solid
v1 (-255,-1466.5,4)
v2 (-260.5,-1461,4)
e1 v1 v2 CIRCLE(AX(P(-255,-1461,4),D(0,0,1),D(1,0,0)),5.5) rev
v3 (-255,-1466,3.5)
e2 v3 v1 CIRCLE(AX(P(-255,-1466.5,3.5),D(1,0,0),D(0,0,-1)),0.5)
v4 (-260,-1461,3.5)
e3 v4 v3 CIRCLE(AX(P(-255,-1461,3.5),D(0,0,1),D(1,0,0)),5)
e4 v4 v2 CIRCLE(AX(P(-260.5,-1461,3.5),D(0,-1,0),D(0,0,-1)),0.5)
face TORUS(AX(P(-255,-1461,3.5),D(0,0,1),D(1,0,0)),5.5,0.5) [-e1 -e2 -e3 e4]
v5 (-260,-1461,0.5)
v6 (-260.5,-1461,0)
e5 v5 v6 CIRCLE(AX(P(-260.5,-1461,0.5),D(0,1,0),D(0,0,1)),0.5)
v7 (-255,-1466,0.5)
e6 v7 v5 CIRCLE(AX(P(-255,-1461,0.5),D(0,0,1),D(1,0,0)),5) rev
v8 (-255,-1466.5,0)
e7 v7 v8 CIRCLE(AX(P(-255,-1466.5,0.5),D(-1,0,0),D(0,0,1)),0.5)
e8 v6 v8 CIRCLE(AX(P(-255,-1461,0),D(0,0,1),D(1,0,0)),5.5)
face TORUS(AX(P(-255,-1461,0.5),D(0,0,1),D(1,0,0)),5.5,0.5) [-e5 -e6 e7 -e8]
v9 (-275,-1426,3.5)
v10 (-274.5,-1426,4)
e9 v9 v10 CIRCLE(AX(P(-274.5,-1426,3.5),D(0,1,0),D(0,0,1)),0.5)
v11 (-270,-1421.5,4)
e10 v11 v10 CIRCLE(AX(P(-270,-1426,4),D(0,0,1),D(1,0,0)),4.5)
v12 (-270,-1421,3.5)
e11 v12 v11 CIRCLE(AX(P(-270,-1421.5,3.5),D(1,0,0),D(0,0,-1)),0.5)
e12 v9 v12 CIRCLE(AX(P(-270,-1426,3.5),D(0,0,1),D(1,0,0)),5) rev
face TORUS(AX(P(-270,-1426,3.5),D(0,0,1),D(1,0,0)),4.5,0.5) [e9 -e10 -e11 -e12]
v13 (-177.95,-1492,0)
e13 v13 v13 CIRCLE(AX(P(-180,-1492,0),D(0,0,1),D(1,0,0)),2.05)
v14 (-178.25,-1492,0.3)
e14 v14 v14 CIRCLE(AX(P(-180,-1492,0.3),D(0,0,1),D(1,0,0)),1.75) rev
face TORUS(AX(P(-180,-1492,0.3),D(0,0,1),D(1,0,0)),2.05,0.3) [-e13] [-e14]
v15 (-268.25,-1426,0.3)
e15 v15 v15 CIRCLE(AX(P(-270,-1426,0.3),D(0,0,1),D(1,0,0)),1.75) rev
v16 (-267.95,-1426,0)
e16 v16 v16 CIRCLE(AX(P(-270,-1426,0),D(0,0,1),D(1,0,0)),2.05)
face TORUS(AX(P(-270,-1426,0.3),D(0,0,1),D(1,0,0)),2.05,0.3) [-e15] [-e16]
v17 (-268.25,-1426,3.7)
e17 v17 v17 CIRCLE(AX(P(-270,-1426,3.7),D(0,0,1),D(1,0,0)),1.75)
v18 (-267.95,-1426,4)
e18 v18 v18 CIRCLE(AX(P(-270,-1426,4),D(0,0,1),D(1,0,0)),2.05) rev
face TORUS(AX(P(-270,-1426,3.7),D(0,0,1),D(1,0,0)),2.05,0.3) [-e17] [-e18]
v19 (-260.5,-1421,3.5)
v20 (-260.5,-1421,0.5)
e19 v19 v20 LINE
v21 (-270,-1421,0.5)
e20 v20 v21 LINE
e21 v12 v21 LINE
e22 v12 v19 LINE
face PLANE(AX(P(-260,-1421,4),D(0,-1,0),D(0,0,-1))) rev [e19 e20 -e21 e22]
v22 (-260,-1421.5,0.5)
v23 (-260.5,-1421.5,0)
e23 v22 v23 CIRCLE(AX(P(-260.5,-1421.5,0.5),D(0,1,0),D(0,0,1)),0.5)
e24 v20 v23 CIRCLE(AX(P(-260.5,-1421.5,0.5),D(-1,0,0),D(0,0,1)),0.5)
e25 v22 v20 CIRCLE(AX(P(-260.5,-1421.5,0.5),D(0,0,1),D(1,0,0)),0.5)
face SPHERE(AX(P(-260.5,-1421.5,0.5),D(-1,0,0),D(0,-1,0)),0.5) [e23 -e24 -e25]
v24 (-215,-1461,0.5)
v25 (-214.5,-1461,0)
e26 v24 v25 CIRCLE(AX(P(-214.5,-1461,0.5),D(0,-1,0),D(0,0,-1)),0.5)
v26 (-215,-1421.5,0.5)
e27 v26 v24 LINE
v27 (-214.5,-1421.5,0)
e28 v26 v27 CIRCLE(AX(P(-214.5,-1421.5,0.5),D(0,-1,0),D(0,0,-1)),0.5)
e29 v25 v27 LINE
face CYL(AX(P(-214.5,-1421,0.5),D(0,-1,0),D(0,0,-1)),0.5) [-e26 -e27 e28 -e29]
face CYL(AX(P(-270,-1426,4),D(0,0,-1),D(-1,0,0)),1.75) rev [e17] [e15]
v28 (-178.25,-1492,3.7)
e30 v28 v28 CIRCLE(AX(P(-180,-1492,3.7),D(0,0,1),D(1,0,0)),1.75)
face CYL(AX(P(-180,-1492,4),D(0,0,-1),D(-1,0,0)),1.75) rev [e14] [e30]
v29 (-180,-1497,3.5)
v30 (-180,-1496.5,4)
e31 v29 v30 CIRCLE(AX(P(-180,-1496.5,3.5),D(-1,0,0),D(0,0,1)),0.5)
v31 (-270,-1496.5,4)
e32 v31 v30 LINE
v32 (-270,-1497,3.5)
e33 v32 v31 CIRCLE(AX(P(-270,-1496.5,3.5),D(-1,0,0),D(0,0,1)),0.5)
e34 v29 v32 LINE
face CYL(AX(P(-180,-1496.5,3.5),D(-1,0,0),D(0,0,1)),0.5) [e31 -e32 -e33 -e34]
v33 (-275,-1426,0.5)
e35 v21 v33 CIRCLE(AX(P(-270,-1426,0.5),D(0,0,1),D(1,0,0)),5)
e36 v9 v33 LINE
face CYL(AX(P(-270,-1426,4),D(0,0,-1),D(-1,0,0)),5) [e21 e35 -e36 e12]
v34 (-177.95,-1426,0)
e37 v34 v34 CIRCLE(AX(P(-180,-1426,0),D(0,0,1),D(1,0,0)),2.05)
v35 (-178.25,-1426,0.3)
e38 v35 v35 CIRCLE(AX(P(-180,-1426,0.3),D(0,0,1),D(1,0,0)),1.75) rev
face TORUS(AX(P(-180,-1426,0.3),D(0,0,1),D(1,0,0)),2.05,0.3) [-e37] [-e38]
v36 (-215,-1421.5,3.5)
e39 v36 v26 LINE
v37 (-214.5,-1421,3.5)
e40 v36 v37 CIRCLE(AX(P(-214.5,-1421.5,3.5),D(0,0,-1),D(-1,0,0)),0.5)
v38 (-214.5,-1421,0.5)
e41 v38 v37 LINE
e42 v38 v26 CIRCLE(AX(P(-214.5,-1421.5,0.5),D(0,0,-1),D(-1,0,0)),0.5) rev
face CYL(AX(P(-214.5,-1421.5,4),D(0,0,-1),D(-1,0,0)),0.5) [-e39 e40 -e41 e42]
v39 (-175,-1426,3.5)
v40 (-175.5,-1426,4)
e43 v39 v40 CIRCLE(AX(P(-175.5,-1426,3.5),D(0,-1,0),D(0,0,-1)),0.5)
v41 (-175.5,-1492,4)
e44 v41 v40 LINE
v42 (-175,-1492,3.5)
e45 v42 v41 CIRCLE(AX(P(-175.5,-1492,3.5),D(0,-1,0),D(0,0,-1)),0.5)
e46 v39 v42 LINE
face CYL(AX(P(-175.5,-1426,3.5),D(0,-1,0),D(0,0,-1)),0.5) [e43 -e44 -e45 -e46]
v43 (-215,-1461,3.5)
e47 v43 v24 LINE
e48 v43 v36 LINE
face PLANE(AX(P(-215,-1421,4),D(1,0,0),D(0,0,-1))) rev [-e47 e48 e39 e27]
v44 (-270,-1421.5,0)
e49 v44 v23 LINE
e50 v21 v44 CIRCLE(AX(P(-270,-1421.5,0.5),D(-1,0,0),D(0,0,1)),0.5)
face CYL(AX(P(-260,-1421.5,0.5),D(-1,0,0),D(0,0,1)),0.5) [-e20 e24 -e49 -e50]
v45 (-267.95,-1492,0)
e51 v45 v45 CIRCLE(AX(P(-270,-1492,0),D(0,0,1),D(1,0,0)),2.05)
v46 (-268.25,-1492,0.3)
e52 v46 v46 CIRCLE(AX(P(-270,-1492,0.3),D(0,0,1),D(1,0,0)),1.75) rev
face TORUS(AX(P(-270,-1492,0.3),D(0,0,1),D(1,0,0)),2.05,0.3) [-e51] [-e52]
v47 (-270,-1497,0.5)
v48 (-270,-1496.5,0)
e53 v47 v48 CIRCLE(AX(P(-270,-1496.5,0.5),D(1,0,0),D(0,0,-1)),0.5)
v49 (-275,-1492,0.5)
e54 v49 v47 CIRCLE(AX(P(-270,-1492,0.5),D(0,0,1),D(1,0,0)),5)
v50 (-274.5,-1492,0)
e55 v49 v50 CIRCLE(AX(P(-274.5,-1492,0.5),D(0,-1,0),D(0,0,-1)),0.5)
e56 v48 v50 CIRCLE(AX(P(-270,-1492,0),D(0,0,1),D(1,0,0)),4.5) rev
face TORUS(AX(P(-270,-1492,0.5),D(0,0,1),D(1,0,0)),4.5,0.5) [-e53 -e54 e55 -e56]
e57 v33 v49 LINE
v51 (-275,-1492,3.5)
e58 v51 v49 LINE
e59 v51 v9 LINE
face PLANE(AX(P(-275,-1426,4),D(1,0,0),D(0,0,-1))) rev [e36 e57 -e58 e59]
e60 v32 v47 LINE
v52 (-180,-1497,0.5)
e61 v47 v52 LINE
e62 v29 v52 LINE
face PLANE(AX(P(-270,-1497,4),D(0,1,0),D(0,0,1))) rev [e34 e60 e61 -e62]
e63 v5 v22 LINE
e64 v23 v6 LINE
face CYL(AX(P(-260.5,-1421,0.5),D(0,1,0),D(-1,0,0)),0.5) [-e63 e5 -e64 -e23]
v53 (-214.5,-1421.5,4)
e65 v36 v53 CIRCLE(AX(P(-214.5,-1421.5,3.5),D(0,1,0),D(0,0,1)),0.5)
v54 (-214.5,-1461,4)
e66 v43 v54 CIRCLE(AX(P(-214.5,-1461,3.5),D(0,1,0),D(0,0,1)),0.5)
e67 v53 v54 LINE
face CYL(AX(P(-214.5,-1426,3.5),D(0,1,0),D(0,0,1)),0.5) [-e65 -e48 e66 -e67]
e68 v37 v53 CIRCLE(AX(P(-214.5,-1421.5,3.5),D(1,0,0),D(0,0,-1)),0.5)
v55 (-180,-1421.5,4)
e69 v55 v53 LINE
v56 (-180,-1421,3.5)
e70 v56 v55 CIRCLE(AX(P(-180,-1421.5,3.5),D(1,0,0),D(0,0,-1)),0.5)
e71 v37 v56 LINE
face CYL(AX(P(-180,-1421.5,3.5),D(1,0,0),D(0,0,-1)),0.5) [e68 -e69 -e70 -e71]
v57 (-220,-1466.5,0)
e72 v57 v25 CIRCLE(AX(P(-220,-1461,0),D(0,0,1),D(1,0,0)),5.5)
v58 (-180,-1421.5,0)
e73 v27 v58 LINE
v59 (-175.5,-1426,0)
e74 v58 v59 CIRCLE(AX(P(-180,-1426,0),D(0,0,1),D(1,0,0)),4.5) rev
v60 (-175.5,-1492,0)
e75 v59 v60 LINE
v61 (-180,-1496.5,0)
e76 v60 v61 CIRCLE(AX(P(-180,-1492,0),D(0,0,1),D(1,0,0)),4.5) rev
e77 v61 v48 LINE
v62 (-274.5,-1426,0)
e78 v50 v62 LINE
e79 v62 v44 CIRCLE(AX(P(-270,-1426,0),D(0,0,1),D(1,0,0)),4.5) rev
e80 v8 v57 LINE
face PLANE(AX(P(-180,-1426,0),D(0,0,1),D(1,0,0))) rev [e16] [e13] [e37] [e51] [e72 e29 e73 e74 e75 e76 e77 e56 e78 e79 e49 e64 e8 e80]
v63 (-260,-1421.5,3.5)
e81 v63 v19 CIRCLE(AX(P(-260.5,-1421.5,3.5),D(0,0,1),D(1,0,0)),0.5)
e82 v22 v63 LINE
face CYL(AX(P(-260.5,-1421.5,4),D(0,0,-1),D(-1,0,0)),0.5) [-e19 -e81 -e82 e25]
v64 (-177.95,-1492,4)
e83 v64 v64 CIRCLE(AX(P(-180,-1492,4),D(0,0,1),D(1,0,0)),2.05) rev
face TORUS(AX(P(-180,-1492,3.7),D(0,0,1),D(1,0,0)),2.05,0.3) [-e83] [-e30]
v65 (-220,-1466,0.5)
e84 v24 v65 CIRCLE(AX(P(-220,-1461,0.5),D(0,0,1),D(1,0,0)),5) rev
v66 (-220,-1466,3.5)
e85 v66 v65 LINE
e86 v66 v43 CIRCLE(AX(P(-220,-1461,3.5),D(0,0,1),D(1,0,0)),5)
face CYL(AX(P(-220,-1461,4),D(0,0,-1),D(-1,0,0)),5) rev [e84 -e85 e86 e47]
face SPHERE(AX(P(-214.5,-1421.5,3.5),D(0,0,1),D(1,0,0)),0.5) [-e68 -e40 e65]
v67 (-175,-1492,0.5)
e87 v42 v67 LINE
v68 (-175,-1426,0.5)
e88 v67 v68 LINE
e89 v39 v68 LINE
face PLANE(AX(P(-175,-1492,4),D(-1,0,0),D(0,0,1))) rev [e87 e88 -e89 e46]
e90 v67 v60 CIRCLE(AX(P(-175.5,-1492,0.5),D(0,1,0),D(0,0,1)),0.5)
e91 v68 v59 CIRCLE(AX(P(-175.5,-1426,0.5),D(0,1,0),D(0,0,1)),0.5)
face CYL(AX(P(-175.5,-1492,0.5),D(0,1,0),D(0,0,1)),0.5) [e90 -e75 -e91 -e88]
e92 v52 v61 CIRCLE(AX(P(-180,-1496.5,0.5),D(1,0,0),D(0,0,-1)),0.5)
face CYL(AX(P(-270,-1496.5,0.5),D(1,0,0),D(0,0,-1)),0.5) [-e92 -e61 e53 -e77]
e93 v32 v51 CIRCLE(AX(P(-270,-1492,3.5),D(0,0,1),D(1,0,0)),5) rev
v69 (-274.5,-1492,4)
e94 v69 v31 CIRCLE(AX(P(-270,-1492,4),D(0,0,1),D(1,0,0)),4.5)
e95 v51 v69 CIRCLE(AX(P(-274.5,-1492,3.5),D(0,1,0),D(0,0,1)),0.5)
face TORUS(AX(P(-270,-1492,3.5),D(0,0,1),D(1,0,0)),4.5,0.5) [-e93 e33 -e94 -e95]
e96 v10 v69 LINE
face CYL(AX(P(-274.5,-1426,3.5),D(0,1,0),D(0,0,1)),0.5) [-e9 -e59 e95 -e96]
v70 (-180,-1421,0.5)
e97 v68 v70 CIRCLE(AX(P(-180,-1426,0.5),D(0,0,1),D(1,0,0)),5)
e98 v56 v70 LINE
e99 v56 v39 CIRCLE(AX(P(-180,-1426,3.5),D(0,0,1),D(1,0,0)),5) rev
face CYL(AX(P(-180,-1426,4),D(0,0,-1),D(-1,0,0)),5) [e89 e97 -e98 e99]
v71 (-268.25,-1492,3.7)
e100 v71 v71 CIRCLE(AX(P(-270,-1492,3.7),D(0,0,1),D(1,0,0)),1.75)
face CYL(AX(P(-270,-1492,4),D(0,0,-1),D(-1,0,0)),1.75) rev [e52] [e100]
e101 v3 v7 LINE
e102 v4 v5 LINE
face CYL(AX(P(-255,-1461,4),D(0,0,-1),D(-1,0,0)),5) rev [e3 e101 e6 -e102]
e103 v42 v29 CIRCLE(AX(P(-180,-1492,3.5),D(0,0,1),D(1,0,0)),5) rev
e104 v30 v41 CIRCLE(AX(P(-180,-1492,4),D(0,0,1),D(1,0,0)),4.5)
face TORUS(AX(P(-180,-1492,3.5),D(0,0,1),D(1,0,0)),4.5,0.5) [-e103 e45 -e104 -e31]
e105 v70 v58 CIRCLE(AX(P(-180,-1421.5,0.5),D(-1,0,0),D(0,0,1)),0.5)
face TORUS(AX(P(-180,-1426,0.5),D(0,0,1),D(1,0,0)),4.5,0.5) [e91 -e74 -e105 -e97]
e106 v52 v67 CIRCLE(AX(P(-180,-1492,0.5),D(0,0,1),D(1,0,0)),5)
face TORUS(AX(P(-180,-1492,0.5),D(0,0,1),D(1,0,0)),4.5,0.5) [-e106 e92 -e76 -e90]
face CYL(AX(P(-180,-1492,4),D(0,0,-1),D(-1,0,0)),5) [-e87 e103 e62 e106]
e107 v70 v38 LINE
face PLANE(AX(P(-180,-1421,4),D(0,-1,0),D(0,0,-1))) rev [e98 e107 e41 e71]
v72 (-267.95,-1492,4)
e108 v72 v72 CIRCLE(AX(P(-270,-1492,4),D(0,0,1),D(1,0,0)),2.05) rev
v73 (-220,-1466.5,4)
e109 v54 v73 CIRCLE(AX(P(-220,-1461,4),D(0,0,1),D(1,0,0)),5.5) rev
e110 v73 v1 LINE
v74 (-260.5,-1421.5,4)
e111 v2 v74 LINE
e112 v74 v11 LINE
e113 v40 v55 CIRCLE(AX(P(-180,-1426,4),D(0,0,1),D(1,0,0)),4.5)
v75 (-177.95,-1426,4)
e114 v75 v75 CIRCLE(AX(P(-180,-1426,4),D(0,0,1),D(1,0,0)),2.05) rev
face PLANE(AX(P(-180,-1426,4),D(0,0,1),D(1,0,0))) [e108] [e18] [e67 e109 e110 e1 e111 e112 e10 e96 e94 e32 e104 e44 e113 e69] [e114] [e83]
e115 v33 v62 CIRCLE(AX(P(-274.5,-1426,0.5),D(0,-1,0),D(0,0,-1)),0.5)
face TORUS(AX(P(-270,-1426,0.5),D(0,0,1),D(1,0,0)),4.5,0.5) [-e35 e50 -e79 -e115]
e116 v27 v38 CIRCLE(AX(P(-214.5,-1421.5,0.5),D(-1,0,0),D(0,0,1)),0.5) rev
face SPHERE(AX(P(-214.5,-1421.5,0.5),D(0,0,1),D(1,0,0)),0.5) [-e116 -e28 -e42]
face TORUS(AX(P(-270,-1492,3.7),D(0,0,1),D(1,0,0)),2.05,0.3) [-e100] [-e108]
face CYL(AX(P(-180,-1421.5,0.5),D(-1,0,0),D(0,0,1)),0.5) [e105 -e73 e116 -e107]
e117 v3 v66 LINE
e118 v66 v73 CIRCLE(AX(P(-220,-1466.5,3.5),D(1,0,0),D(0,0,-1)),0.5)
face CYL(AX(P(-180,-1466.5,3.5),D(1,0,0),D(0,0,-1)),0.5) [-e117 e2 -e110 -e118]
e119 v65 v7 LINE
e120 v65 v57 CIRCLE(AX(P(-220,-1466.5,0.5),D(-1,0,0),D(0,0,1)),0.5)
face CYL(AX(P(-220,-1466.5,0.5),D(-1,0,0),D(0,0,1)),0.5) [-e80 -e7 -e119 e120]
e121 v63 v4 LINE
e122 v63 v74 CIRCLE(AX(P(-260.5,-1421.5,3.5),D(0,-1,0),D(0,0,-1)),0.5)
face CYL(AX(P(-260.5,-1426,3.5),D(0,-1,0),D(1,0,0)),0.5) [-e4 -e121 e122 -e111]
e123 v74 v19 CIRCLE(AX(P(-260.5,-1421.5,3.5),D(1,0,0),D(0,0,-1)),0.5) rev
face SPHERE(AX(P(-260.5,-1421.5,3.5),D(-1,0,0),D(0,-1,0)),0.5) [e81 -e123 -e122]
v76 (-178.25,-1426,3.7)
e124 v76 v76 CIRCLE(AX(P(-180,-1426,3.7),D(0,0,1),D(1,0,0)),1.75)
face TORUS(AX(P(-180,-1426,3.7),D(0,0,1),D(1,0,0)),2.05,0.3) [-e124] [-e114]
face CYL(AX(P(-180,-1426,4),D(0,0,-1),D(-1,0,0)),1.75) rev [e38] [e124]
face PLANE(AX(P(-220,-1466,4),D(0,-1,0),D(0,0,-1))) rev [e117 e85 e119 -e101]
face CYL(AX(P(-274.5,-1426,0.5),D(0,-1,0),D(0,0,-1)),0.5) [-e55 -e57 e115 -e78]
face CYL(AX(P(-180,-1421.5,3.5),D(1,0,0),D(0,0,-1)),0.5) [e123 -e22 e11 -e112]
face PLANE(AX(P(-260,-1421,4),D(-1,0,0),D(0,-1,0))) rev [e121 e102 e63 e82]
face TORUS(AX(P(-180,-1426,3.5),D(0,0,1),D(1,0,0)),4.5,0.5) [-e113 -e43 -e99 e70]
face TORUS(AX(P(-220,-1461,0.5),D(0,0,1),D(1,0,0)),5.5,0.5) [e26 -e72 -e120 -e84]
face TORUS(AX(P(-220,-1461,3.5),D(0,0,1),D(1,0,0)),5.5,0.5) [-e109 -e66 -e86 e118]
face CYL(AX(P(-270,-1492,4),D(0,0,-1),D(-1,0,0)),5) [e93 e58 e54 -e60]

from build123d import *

# Parameters (mm, degrees)
SKETCH2_R           = 1.75
BOSS_EXTRUDE1_DEPTH = 4
FILLET1_R           = 0.5
FILLET2_R           = 0.5
FILLET3_R           = 0.3


with BuildPart() as part:
    # Sketch2 → Boss-Extrude1 (new body)
    with BuildSketch(Plane.XY):
        with BuildLine():
            Line((-260, -1421), (-270, -1421))
            ThreePointArc((-270, -1421), (-273.535533906, -1422.464466094), (-275, -1426))
            Line((-275, -1426), (-275, -1492))
            ThreePointArc((-275, -1492), (-273.535533906, -1495.535533906), (-270, -1497))
            Line((-270, -1497), (-180, -1497))
            ThreePointArc((-180, -1497), (-176.464466094, -1495.535533906), (-175, -1492))
            Line((-175, -1492), (-175, -1426))
            ThreePointArc((-175, -1426), (-176.464466094, -1422.464466094), (-180, -1421))
            Line((-180, -1421), (-215, -1421))
            Line((-215, -1421), (-215, -1461))
            ThreePointArc((-215, -1461), (-216.464466094, -1464.535533906), (-220, -1466))
            Line((-220, -1466), (-255, -1466))
            ThreePointArc((-255, -1466), (-258.535533906, -1464.535533906), (-260, -1461))
            Line((-260, -1461), (-260, -1421))
        make_face()
        with Locations((-180, -1492)):
            Circle(SKETCH2_R, mode=Mode.SUBTRACT)
        with Locations((-270, -1492)):
            Circle(SKETCH2_R, mode=Mode.SUBTRACT)
        with Locations((-270, -1426)):
            Circle(SKETCH2_R, mode=Mode.SUBTRACT)
        with Locations((-180, -1426)):
            Circle(SKETCH2_R, mode=Mode.SUBTRACT)
    extrude(amount=BOSS_EXTRUDE1_DEPTH)

    # Fillet1
    fillet1_edges = [part.edges().sort_by_distance(p)[0] for p in [
        (-175, -1459, 0),
        (-176.464466094, -1495.535533906, 0),
        (-225, -1497, 0),
        (-273.535533906, -1495.535533906, 0),
        (-275, -1459, 0),
        (-273.535533906, -1422.464466094, 0),
        (-265, -1421, 0),
        (-197.5, -1421, 0),
        (-176.464466094, -1422.464466094, 0),
        (-215, -1421, 2),
        (-265, -1421, 4),
        (-273.535533906, -1422.464466094, 4),
        (-275, -1459, 4),
        (-273.535533906, -1495.535533906, 4),
        (-225, -1497, 4),
        (-176.464466094, -1422.464466094, 4),
        (-176.464466094, -1495.535533906, 4),
        (-175, -1459, 4),
        (-197.5, -1421, 4),
    ]]
    fillet(fillet1_edges, radius=FILLET1_R)

    # Fillet2
    # the kernel refuses this fillet: 0.5 mm, written as the material it takes off along each edge
    with BuildSketch(Plane(origin=(-214.5, -1421.5, 0.5), x_dir=(-1, 0, 0), z_dir=(0, 0, -1))) as fillet2_piece_1_section:
        Polygon((0, 0), (FILLET2_R, 0), (FILLET2_R, FILLET2_R), (0, FILLET2_R), align=None)
    fillet2_piece_1 = extrude(amount=FILLET2_R, mode=Mode.PRIVATE)
    fillet2_piece_1 = fillet2_piece_1 - Plane(origin=(-214.5, -1421.5, 0.5), x_dir=(0.7071067811865475, -0.7071067811865475, 0), z_dir=(0, 0, -1)) * Sphere(FILLET2_R, mode=Mode.PRIVATE)
    add(fillet2_piece_1, mode=Mode.SUBTRACT)
    with BuildSketch(Plane(origin=(-214.5, -1421.5, 3.5), x_dir=(-1, 0, 0), z_dir=(0, 0, 1))) as fillet2_piece_2_section:
        Polygon((0, 0), (FILLET2_R, 0), (FILLET2_R, -FILLET2_R), (0, -FILLET2_R), align=None)
    fillet2_piece_2 = extrude(amount=FILLET2_R, mode=Mode.PRIVATE)
    fillet2_piece_2 = fillet2_piece_2 - Plane(origin=(-214.5, -1421.5, 3.5), x_dir=(0.7071067811865475, -0.7071067811865475, 0), z_dir=(0, 0, 1)) * Sphere(FILLET2_R, mode=Mode.PRIVATE)
    add(fillet2_piece_2, mode=Mode.SUBTRACT)
    with BuildSketch(Plane(origin=(-260, -1461, 0), x_dir=(0, 0, 1), z_dir=(0, 1, 0)), Plane(origin=(-215, -1421.5, 4), x_dir=(1, 0, 0), z_dir=(0, -1, 0))) as fillet2_piece_3:
        with BuildLine():
            CenterArc((FILLET2_R, -FILLET2_R), FILLET2_R, 90, 90)
            Line((0, -FILLET2_R), (0, 0))
            Line((0, 0), (FILLET2_R, 0))
        make_face()
    extrude(amount=39.5, mode=Mode.SUBTRACT)
    with BuildSketch(Plane(origin=(-220, -1461, 4), x_dir=(1, 0, 0), z_dir=(0, 1, 0))) as fillet2_piece_4:
        with BuildLine():
            CenterArc((5 + FILLET2_R, FILLET2_R), FILLET2_R, 180, 90)
            Line((5, FILLET2_R), (5, 0))
            Line((5, 0), (5 + FILLET2_R, 0))
        make_face()
    revolve(axis=Axis((-220, -1461, 4), (0, 0, -1)), revolution_arc=90, mode=Mode.SUBTRACT)
    with BuildSketch(Plane(origin=(-255, -1461, 0), x_dir=(0, -1, 0), z_dir=(1, 0, 0))) as fillet2_piece_5:
        with BuildLine():
            CenterArc((5 + FILLET2_R, -FILLET2_R), FILLET2_R, 90, 90)
            Line((5, -FILLET2_R), (5, 0))
            Line((5, 0), (5 + FILLET2_R, 0))
        make_face()
    revolve(axis=Axis((-255, -1461, 0), (0, 0, -1)), revolution_arc=90, mode=Mode.SUBTRACT)
    with BuildSketch(Plane(origin=(-220, -1466, 0), x_dir=(0, -1, 0), z_dir=(-1, 0, 0))) as fillet2_piece_6:
        with BuildLine():
            CenterArc((FILLET2_R, FILLET2_R), FILLET2_R, 180, 90)
            Line((0, FILLET2_R), (0, 0))
            Line((0, 0), (FILLET2_R, 0))
        make_face()
    extrude(amount=35, mode=Mode.SUBTRACT)
    with BuildSketch(Plane(origin=(-220, -1461, 0), x_dir=(1, 0, 0), z_dir=(0, 1, 0))) as fillet2_piece_7:
        with BuildLine():
            CenterArc((5 + FILLET2_R, -FILLET2_R), FILLET2_R, 90, 90)
            Line((5, -FILLET2_R), (5, 0))
            Line((5, 0), (5 + FILLET2_R, 0))
        make_face()
    revolve(axis=Axis((-220, -1461, 0), (0, 0, -1)), revolution_arc=90, mode=Mode.SUBTRACT)
    with BuildSketch(Plane(origin=(-220, -1466, 4), x_dir=(0, -1, 0), z_dir=(-1, 0, 0))) as fillet2_piece_8:
        with BuildLine():
            CenterArc((FILLET2_R, -FILLET2_R), FILLET2_R, 90, 90)
            Line((0, -FILLET2_R), (0, 0))
            Line((0, 0), (FILLET2_R, 0))
        make_face()
    extrude(amount=35, mode=Mode.SUBTRACT)
    with BuildSketch(Plane(origin=(-255, -1461, 4), x_dir=(0, -1, 0), z_dir=(1, 0, 0))) as fillet2_piece_9:
        with BuildLine():
            CenterArc((5 + FILLET2_R, FILLET2_R), FILLET2_R, 180, 90)
            Line((5, FILLET2_R), (5, 0))
            Line((5, 0), (5 + FILLET2_R, 0))
        make_face()
    revolve(axis=Axis((-255, -1461, 4), (0, 0, -1)), revolution_arc=90, mode=Mode.SUBTRACT)
    with BuildSketch(Plane(origin=(-260, -1461, 4), x_dir=(0, 0, -1), z_dir=(0, 1, 0)), Plane(origin=(-215, -1421.5, 0), x_dir=(1, 0, 0), z_dir=(0, -1, 0))) as fillet2_piece_10:
        with BuildLine():
            CenterArc((FILLET2_R, FILLET2_R), FILLET2_R, 180, 90)
            Line((0, FILLET2_R), (0, 0))
            Line((0, 0), (FILLET2_R, 0))
        make_face()
    extrude(amount=39.5, mode=Mode.SUBTRACT)
    with BuildSketch(Plane(origin=(-260, -1421, 0.5), x_dir=(0, -1, 0), z_dir=(0, 0, 1))) as fillet2_piece_11:
        with BuildLine():
            CenterArc((FILLET2_R, -FILLET2_R), FILLET2_R, 90, 90)
            Line((0, -FILLET2_R), (0, 0))
            Line((0, 0), (FILLET2_R, 0))
        make_face()
    extrude(amount=3, mode=Mode.SUBTRACT)
    with BuildSketch(Plane(origin=(-260, -1421.5, 0.5), x_dir=(0, 1, 0), z_dir=(0, 0, 1))) as fillet2_piece_12:
        with BuildLine():
            CenterArc((0.5 - FILLET2_R, FILLET2_R), FILLET2_R, 270, 90)
            Line((0.5, FILLET2_R), (0.5, 0))
            Line((0.5, 0), (0.5 - FILLET2_R, 0))
        make_face()
    revolve(axis=Axis((-260, -1421.5, 0.5), (-1, 0, 0)), revolution_arc=90, mode=Mode.SUBTRACT)
    with BuildSketch(Plane(origin=(-260, -1421.5, 3.5), x_dir=(0, 1, 0), z_dir=(0, 0, -1))) as fillet2_piece_13:
        with BuildLine():
            CenterArc((0.5 - FILLET2_R, -FILLET2_R), FILLET2_R, 0, 90)
            Line((0.5, -FILLET2_R), (0.5, 0))
            Line((0.5, 0), (0.5 - FILLET2_R, 0))
        make_face()
    revolve(axis=Axis((-260, -1421.5, 3.5), (1, 0, 0)), revolution_arc=90, mode=Mode.SUBTRACT)

    # Fillet3
    fillet3_edges = [part.edges().sort_by_distance(p)[0] for p in [
        (-181.75, -1492, 0),
        (-181.75, -1492, 4),
        (-271.75, -1492, 0),
        (-271.75, -1492, 4),
        (-271.75, -1426, 0),
        (-271.75, -1426, 4),
        (-181.75, -1426, 0),
        (-181.75, -1426, 4),
    ]]
    fillet(fillet3_edges, radius=FILLET3_R)


solid = part.part
